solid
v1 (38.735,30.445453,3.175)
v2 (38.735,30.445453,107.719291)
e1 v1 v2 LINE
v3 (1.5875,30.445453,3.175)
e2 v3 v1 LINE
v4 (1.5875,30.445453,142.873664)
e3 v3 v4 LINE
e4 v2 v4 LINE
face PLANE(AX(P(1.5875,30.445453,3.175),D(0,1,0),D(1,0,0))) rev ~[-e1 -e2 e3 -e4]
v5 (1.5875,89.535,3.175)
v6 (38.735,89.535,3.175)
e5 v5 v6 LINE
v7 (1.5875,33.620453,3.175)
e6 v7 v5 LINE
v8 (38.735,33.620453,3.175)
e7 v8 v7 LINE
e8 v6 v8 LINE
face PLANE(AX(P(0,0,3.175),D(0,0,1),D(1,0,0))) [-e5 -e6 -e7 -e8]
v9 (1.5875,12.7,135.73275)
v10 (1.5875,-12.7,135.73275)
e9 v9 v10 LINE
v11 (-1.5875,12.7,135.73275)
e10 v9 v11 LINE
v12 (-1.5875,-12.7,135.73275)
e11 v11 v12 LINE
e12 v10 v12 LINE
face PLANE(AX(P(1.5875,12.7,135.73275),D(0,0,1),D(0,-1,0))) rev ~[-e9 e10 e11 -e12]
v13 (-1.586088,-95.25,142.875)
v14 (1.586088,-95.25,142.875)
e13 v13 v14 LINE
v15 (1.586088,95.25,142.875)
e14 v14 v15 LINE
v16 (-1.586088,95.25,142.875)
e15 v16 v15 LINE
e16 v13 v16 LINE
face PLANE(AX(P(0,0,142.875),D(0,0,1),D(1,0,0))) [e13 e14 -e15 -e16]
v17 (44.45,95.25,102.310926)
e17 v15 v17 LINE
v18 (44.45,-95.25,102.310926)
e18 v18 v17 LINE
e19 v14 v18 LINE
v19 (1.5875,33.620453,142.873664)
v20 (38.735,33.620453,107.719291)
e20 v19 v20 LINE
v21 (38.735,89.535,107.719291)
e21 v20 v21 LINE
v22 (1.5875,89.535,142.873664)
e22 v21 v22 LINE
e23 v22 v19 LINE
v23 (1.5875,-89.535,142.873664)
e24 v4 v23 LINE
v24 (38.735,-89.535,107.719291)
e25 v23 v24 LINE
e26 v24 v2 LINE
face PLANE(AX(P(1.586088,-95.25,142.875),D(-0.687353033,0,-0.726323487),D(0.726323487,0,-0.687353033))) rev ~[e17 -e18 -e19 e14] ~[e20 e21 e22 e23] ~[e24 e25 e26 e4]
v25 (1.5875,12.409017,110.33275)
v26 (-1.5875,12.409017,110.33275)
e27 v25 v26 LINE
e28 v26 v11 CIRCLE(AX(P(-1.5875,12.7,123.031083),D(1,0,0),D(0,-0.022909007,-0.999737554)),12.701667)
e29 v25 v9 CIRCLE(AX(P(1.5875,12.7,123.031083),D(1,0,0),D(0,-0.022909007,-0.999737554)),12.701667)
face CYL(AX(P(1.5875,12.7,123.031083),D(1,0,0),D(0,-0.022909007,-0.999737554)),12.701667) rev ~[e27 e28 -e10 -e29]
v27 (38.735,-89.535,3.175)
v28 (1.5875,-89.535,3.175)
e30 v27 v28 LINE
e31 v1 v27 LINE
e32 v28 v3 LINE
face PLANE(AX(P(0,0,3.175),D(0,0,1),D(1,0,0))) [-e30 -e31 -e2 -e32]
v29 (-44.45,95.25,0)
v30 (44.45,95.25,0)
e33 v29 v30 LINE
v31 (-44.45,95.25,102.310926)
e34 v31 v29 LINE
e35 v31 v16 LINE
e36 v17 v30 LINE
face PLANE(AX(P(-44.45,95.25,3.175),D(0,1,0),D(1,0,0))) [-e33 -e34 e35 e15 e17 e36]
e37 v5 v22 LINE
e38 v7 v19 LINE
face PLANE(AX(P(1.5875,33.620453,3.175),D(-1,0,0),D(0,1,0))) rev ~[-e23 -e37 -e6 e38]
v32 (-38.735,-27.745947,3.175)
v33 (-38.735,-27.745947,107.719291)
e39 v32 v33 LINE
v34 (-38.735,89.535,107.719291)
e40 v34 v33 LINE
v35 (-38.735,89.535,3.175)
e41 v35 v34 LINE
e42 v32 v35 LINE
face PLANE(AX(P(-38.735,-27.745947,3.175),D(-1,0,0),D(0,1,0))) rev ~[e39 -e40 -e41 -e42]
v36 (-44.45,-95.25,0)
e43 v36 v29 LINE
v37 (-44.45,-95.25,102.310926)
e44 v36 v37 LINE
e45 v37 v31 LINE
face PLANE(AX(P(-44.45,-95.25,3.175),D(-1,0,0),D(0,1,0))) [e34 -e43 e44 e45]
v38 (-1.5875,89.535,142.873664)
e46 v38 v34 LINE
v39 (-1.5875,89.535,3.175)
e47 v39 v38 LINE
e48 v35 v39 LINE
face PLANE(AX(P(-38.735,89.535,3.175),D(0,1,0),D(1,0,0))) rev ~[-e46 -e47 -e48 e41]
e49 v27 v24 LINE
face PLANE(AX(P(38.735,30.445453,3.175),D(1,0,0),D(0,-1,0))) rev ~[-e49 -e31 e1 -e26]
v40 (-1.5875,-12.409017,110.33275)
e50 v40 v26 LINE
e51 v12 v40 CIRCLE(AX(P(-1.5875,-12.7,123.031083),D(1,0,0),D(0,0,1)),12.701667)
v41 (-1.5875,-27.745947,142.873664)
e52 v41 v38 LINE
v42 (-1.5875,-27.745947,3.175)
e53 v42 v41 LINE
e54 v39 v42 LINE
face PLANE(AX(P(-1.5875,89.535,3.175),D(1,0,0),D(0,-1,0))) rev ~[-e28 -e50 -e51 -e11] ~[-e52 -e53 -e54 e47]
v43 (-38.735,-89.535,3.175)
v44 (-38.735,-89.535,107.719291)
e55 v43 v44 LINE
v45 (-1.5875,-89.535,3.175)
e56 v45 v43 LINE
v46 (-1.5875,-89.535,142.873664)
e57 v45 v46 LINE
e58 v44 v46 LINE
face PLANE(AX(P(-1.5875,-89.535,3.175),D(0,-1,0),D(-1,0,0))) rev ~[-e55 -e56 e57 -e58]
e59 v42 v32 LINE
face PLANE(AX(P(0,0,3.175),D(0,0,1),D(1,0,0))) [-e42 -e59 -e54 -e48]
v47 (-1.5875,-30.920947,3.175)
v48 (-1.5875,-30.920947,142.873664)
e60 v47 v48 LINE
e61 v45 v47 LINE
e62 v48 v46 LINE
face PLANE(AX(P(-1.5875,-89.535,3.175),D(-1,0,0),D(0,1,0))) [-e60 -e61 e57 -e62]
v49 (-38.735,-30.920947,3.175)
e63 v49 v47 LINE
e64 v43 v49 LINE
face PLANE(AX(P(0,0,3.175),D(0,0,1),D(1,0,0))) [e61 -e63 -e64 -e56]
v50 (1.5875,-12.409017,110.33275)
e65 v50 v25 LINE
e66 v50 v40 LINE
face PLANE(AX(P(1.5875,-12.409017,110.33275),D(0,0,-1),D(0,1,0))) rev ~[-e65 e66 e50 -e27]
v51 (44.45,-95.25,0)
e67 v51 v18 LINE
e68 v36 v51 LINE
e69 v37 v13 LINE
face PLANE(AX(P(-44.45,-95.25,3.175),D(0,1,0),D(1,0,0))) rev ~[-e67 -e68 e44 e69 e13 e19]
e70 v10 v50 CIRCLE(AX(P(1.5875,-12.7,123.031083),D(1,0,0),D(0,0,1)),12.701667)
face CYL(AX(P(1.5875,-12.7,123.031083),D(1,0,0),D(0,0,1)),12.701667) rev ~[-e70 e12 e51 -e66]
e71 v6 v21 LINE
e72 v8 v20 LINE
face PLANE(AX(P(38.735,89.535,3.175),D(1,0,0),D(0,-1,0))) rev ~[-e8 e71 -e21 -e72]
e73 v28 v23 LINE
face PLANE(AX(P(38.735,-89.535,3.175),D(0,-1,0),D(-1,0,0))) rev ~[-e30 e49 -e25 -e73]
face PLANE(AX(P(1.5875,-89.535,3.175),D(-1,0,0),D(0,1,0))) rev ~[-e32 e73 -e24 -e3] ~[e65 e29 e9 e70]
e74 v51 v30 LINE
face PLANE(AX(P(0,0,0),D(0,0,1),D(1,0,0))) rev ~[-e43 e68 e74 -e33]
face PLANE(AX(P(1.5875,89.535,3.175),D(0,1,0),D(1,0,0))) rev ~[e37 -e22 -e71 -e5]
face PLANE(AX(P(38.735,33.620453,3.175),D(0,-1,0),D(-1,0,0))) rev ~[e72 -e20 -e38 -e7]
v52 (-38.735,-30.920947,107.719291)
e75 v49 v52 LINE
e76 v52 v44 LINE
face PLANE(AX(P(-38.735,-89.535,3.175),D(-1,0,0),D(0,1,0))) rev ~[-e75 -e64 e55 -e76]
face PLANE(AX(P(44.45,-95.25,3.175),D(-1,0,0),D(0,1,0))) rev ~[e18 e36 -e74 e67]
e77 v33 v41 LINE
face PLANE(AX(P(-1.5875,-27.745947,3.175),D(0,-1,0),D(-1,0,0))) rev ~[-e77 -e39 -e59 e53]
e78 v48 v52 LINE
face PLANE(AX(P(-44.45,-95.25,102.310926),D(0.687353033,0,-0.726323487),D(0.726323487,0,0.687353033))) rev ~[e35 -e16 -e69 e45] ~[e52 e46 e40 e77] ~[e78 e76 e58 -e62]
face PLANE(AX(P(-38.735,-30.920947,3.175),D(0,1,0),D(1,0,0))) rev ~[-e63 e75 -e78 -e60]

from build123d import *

# Parameters (mm, degrees)
F0_W     = 88.9
F0_H     = 190.5
F0_W_2   = 82.55
F0_H_2   = 184.15
F1_DEPTH = 3.175
F2_W     = 88.9
F2_H     = 190.5
F2_W_2   = 3.175
F2_H_2   = 3.175
F2_W_3   = 37.1475
F2_H_3   = 58.1914
F2_H_4   = 55.9145467066
F2_H_5   = 58.6140532934
F3_DEPTH = 139.7
F6_DEPTH = 190.5
F8_DEPTH = 25.4


# Not quite as in the source:
# - a feature names something its author has since deleted; it is built from what else it names


with BuildPart() as f1:
    # F0 (on Top) → F1 (new body)
    with BuildSketch(Plane.XY):
        Rectangle(F0_W, F0_H)
        Rectangle(F0_W_2, F0_H_2, mode=Mode.SUBTRACT)
        Rectangle(F0_W_2, F0_H_2)
    extrude(amount=F1_DEPTH)

    # F2 (on face) → F3 (join)
    with BuildSketch(Plane.XY.offset(3.175)):
        Rectangle(F2_W, F2_H)
        Polygon((-1.5875, -89.535), (-38.735, -89.535), (-38.735, -30.9209467066), (-38.735, -27.7459467066), (-38.735, 89.535), (-1.5875, 89.535), (1.5875, 89.535), (38.735, 89.535), (38.735, 33.6204532934), (38.735, 30.4454532934), (38.735, -89.535), (1.5875, -89.535), align=None, mode=Mode.SUBTRACT)
        with Locations((0, 32.0329532934)):
            Rectangle(F2_W_2, F2_H_2)
        with Locations((20.16125, 32.0329532934)):
            Rectangle(F2_W_3, F2_H_2)
        with Locations((-20.16125, -29.3334467066)):
            Rectangle(F2_W_3, F2_H_2)
        with Locations((0, -29.3334467066)):
            Rectangle(F2_W_2, F2_H_2)
        with Locations((0, 1.3497532934)):
            Rectangle(F2_W_2, F2_H_3)
        with Locations((0, 61.5777266467)):
            Rectangle(F2_W_2, F2_H_4)
        with Locations((0, -60.2279733533)):
            Rectangle(F2_W_2, F2_H_5)
    extrude(amount=F3_DEPTH)

    # F5 (on face) → F6 (cut)
    with BuildSketch(Plane.XZ.offset(95.25)):
        Polygon((-44.45, 102.3109257221), (-1.5860880958, 142.875), (-44.45, 142.875), align=None)
        Polygon((44.45, 142.875), (1.5860880958, 142.875), (44.45, 102.3109257221), align=None)
    extrude(amount=-F6_DEPTH, mode=Mode.SUBTRACT)

    # F7 (on face) → F8 (cut)
    with BuildSketch(Plane.YZ.offset(1.5875)):
        with BuildLine():
            Line((12.7, 135.732749784), (0, 135.732749784))
            Line((0, 135.732749784), (-12.7, 135.732749784))
            ThreePointArc((-12.7, 135.732749784), (-25.4008333473, 122.8855821986), (-12.4090174213, 110.332749784))
            Line((-12.4090174213, 110.332749784), (0, 110.332749784))
            Line((0, 110.332749784), (12.4090174213, 110.332749784))
            ThreePointArc((12.4090174213, 110.332749784), (25.4008333473, 122.8855821986), (12.7, 135.732749784))
        make_face()
    extrude(amount=-F8_DEPTH, mode=Mode.SUBTRACT)


solid = f1.part
